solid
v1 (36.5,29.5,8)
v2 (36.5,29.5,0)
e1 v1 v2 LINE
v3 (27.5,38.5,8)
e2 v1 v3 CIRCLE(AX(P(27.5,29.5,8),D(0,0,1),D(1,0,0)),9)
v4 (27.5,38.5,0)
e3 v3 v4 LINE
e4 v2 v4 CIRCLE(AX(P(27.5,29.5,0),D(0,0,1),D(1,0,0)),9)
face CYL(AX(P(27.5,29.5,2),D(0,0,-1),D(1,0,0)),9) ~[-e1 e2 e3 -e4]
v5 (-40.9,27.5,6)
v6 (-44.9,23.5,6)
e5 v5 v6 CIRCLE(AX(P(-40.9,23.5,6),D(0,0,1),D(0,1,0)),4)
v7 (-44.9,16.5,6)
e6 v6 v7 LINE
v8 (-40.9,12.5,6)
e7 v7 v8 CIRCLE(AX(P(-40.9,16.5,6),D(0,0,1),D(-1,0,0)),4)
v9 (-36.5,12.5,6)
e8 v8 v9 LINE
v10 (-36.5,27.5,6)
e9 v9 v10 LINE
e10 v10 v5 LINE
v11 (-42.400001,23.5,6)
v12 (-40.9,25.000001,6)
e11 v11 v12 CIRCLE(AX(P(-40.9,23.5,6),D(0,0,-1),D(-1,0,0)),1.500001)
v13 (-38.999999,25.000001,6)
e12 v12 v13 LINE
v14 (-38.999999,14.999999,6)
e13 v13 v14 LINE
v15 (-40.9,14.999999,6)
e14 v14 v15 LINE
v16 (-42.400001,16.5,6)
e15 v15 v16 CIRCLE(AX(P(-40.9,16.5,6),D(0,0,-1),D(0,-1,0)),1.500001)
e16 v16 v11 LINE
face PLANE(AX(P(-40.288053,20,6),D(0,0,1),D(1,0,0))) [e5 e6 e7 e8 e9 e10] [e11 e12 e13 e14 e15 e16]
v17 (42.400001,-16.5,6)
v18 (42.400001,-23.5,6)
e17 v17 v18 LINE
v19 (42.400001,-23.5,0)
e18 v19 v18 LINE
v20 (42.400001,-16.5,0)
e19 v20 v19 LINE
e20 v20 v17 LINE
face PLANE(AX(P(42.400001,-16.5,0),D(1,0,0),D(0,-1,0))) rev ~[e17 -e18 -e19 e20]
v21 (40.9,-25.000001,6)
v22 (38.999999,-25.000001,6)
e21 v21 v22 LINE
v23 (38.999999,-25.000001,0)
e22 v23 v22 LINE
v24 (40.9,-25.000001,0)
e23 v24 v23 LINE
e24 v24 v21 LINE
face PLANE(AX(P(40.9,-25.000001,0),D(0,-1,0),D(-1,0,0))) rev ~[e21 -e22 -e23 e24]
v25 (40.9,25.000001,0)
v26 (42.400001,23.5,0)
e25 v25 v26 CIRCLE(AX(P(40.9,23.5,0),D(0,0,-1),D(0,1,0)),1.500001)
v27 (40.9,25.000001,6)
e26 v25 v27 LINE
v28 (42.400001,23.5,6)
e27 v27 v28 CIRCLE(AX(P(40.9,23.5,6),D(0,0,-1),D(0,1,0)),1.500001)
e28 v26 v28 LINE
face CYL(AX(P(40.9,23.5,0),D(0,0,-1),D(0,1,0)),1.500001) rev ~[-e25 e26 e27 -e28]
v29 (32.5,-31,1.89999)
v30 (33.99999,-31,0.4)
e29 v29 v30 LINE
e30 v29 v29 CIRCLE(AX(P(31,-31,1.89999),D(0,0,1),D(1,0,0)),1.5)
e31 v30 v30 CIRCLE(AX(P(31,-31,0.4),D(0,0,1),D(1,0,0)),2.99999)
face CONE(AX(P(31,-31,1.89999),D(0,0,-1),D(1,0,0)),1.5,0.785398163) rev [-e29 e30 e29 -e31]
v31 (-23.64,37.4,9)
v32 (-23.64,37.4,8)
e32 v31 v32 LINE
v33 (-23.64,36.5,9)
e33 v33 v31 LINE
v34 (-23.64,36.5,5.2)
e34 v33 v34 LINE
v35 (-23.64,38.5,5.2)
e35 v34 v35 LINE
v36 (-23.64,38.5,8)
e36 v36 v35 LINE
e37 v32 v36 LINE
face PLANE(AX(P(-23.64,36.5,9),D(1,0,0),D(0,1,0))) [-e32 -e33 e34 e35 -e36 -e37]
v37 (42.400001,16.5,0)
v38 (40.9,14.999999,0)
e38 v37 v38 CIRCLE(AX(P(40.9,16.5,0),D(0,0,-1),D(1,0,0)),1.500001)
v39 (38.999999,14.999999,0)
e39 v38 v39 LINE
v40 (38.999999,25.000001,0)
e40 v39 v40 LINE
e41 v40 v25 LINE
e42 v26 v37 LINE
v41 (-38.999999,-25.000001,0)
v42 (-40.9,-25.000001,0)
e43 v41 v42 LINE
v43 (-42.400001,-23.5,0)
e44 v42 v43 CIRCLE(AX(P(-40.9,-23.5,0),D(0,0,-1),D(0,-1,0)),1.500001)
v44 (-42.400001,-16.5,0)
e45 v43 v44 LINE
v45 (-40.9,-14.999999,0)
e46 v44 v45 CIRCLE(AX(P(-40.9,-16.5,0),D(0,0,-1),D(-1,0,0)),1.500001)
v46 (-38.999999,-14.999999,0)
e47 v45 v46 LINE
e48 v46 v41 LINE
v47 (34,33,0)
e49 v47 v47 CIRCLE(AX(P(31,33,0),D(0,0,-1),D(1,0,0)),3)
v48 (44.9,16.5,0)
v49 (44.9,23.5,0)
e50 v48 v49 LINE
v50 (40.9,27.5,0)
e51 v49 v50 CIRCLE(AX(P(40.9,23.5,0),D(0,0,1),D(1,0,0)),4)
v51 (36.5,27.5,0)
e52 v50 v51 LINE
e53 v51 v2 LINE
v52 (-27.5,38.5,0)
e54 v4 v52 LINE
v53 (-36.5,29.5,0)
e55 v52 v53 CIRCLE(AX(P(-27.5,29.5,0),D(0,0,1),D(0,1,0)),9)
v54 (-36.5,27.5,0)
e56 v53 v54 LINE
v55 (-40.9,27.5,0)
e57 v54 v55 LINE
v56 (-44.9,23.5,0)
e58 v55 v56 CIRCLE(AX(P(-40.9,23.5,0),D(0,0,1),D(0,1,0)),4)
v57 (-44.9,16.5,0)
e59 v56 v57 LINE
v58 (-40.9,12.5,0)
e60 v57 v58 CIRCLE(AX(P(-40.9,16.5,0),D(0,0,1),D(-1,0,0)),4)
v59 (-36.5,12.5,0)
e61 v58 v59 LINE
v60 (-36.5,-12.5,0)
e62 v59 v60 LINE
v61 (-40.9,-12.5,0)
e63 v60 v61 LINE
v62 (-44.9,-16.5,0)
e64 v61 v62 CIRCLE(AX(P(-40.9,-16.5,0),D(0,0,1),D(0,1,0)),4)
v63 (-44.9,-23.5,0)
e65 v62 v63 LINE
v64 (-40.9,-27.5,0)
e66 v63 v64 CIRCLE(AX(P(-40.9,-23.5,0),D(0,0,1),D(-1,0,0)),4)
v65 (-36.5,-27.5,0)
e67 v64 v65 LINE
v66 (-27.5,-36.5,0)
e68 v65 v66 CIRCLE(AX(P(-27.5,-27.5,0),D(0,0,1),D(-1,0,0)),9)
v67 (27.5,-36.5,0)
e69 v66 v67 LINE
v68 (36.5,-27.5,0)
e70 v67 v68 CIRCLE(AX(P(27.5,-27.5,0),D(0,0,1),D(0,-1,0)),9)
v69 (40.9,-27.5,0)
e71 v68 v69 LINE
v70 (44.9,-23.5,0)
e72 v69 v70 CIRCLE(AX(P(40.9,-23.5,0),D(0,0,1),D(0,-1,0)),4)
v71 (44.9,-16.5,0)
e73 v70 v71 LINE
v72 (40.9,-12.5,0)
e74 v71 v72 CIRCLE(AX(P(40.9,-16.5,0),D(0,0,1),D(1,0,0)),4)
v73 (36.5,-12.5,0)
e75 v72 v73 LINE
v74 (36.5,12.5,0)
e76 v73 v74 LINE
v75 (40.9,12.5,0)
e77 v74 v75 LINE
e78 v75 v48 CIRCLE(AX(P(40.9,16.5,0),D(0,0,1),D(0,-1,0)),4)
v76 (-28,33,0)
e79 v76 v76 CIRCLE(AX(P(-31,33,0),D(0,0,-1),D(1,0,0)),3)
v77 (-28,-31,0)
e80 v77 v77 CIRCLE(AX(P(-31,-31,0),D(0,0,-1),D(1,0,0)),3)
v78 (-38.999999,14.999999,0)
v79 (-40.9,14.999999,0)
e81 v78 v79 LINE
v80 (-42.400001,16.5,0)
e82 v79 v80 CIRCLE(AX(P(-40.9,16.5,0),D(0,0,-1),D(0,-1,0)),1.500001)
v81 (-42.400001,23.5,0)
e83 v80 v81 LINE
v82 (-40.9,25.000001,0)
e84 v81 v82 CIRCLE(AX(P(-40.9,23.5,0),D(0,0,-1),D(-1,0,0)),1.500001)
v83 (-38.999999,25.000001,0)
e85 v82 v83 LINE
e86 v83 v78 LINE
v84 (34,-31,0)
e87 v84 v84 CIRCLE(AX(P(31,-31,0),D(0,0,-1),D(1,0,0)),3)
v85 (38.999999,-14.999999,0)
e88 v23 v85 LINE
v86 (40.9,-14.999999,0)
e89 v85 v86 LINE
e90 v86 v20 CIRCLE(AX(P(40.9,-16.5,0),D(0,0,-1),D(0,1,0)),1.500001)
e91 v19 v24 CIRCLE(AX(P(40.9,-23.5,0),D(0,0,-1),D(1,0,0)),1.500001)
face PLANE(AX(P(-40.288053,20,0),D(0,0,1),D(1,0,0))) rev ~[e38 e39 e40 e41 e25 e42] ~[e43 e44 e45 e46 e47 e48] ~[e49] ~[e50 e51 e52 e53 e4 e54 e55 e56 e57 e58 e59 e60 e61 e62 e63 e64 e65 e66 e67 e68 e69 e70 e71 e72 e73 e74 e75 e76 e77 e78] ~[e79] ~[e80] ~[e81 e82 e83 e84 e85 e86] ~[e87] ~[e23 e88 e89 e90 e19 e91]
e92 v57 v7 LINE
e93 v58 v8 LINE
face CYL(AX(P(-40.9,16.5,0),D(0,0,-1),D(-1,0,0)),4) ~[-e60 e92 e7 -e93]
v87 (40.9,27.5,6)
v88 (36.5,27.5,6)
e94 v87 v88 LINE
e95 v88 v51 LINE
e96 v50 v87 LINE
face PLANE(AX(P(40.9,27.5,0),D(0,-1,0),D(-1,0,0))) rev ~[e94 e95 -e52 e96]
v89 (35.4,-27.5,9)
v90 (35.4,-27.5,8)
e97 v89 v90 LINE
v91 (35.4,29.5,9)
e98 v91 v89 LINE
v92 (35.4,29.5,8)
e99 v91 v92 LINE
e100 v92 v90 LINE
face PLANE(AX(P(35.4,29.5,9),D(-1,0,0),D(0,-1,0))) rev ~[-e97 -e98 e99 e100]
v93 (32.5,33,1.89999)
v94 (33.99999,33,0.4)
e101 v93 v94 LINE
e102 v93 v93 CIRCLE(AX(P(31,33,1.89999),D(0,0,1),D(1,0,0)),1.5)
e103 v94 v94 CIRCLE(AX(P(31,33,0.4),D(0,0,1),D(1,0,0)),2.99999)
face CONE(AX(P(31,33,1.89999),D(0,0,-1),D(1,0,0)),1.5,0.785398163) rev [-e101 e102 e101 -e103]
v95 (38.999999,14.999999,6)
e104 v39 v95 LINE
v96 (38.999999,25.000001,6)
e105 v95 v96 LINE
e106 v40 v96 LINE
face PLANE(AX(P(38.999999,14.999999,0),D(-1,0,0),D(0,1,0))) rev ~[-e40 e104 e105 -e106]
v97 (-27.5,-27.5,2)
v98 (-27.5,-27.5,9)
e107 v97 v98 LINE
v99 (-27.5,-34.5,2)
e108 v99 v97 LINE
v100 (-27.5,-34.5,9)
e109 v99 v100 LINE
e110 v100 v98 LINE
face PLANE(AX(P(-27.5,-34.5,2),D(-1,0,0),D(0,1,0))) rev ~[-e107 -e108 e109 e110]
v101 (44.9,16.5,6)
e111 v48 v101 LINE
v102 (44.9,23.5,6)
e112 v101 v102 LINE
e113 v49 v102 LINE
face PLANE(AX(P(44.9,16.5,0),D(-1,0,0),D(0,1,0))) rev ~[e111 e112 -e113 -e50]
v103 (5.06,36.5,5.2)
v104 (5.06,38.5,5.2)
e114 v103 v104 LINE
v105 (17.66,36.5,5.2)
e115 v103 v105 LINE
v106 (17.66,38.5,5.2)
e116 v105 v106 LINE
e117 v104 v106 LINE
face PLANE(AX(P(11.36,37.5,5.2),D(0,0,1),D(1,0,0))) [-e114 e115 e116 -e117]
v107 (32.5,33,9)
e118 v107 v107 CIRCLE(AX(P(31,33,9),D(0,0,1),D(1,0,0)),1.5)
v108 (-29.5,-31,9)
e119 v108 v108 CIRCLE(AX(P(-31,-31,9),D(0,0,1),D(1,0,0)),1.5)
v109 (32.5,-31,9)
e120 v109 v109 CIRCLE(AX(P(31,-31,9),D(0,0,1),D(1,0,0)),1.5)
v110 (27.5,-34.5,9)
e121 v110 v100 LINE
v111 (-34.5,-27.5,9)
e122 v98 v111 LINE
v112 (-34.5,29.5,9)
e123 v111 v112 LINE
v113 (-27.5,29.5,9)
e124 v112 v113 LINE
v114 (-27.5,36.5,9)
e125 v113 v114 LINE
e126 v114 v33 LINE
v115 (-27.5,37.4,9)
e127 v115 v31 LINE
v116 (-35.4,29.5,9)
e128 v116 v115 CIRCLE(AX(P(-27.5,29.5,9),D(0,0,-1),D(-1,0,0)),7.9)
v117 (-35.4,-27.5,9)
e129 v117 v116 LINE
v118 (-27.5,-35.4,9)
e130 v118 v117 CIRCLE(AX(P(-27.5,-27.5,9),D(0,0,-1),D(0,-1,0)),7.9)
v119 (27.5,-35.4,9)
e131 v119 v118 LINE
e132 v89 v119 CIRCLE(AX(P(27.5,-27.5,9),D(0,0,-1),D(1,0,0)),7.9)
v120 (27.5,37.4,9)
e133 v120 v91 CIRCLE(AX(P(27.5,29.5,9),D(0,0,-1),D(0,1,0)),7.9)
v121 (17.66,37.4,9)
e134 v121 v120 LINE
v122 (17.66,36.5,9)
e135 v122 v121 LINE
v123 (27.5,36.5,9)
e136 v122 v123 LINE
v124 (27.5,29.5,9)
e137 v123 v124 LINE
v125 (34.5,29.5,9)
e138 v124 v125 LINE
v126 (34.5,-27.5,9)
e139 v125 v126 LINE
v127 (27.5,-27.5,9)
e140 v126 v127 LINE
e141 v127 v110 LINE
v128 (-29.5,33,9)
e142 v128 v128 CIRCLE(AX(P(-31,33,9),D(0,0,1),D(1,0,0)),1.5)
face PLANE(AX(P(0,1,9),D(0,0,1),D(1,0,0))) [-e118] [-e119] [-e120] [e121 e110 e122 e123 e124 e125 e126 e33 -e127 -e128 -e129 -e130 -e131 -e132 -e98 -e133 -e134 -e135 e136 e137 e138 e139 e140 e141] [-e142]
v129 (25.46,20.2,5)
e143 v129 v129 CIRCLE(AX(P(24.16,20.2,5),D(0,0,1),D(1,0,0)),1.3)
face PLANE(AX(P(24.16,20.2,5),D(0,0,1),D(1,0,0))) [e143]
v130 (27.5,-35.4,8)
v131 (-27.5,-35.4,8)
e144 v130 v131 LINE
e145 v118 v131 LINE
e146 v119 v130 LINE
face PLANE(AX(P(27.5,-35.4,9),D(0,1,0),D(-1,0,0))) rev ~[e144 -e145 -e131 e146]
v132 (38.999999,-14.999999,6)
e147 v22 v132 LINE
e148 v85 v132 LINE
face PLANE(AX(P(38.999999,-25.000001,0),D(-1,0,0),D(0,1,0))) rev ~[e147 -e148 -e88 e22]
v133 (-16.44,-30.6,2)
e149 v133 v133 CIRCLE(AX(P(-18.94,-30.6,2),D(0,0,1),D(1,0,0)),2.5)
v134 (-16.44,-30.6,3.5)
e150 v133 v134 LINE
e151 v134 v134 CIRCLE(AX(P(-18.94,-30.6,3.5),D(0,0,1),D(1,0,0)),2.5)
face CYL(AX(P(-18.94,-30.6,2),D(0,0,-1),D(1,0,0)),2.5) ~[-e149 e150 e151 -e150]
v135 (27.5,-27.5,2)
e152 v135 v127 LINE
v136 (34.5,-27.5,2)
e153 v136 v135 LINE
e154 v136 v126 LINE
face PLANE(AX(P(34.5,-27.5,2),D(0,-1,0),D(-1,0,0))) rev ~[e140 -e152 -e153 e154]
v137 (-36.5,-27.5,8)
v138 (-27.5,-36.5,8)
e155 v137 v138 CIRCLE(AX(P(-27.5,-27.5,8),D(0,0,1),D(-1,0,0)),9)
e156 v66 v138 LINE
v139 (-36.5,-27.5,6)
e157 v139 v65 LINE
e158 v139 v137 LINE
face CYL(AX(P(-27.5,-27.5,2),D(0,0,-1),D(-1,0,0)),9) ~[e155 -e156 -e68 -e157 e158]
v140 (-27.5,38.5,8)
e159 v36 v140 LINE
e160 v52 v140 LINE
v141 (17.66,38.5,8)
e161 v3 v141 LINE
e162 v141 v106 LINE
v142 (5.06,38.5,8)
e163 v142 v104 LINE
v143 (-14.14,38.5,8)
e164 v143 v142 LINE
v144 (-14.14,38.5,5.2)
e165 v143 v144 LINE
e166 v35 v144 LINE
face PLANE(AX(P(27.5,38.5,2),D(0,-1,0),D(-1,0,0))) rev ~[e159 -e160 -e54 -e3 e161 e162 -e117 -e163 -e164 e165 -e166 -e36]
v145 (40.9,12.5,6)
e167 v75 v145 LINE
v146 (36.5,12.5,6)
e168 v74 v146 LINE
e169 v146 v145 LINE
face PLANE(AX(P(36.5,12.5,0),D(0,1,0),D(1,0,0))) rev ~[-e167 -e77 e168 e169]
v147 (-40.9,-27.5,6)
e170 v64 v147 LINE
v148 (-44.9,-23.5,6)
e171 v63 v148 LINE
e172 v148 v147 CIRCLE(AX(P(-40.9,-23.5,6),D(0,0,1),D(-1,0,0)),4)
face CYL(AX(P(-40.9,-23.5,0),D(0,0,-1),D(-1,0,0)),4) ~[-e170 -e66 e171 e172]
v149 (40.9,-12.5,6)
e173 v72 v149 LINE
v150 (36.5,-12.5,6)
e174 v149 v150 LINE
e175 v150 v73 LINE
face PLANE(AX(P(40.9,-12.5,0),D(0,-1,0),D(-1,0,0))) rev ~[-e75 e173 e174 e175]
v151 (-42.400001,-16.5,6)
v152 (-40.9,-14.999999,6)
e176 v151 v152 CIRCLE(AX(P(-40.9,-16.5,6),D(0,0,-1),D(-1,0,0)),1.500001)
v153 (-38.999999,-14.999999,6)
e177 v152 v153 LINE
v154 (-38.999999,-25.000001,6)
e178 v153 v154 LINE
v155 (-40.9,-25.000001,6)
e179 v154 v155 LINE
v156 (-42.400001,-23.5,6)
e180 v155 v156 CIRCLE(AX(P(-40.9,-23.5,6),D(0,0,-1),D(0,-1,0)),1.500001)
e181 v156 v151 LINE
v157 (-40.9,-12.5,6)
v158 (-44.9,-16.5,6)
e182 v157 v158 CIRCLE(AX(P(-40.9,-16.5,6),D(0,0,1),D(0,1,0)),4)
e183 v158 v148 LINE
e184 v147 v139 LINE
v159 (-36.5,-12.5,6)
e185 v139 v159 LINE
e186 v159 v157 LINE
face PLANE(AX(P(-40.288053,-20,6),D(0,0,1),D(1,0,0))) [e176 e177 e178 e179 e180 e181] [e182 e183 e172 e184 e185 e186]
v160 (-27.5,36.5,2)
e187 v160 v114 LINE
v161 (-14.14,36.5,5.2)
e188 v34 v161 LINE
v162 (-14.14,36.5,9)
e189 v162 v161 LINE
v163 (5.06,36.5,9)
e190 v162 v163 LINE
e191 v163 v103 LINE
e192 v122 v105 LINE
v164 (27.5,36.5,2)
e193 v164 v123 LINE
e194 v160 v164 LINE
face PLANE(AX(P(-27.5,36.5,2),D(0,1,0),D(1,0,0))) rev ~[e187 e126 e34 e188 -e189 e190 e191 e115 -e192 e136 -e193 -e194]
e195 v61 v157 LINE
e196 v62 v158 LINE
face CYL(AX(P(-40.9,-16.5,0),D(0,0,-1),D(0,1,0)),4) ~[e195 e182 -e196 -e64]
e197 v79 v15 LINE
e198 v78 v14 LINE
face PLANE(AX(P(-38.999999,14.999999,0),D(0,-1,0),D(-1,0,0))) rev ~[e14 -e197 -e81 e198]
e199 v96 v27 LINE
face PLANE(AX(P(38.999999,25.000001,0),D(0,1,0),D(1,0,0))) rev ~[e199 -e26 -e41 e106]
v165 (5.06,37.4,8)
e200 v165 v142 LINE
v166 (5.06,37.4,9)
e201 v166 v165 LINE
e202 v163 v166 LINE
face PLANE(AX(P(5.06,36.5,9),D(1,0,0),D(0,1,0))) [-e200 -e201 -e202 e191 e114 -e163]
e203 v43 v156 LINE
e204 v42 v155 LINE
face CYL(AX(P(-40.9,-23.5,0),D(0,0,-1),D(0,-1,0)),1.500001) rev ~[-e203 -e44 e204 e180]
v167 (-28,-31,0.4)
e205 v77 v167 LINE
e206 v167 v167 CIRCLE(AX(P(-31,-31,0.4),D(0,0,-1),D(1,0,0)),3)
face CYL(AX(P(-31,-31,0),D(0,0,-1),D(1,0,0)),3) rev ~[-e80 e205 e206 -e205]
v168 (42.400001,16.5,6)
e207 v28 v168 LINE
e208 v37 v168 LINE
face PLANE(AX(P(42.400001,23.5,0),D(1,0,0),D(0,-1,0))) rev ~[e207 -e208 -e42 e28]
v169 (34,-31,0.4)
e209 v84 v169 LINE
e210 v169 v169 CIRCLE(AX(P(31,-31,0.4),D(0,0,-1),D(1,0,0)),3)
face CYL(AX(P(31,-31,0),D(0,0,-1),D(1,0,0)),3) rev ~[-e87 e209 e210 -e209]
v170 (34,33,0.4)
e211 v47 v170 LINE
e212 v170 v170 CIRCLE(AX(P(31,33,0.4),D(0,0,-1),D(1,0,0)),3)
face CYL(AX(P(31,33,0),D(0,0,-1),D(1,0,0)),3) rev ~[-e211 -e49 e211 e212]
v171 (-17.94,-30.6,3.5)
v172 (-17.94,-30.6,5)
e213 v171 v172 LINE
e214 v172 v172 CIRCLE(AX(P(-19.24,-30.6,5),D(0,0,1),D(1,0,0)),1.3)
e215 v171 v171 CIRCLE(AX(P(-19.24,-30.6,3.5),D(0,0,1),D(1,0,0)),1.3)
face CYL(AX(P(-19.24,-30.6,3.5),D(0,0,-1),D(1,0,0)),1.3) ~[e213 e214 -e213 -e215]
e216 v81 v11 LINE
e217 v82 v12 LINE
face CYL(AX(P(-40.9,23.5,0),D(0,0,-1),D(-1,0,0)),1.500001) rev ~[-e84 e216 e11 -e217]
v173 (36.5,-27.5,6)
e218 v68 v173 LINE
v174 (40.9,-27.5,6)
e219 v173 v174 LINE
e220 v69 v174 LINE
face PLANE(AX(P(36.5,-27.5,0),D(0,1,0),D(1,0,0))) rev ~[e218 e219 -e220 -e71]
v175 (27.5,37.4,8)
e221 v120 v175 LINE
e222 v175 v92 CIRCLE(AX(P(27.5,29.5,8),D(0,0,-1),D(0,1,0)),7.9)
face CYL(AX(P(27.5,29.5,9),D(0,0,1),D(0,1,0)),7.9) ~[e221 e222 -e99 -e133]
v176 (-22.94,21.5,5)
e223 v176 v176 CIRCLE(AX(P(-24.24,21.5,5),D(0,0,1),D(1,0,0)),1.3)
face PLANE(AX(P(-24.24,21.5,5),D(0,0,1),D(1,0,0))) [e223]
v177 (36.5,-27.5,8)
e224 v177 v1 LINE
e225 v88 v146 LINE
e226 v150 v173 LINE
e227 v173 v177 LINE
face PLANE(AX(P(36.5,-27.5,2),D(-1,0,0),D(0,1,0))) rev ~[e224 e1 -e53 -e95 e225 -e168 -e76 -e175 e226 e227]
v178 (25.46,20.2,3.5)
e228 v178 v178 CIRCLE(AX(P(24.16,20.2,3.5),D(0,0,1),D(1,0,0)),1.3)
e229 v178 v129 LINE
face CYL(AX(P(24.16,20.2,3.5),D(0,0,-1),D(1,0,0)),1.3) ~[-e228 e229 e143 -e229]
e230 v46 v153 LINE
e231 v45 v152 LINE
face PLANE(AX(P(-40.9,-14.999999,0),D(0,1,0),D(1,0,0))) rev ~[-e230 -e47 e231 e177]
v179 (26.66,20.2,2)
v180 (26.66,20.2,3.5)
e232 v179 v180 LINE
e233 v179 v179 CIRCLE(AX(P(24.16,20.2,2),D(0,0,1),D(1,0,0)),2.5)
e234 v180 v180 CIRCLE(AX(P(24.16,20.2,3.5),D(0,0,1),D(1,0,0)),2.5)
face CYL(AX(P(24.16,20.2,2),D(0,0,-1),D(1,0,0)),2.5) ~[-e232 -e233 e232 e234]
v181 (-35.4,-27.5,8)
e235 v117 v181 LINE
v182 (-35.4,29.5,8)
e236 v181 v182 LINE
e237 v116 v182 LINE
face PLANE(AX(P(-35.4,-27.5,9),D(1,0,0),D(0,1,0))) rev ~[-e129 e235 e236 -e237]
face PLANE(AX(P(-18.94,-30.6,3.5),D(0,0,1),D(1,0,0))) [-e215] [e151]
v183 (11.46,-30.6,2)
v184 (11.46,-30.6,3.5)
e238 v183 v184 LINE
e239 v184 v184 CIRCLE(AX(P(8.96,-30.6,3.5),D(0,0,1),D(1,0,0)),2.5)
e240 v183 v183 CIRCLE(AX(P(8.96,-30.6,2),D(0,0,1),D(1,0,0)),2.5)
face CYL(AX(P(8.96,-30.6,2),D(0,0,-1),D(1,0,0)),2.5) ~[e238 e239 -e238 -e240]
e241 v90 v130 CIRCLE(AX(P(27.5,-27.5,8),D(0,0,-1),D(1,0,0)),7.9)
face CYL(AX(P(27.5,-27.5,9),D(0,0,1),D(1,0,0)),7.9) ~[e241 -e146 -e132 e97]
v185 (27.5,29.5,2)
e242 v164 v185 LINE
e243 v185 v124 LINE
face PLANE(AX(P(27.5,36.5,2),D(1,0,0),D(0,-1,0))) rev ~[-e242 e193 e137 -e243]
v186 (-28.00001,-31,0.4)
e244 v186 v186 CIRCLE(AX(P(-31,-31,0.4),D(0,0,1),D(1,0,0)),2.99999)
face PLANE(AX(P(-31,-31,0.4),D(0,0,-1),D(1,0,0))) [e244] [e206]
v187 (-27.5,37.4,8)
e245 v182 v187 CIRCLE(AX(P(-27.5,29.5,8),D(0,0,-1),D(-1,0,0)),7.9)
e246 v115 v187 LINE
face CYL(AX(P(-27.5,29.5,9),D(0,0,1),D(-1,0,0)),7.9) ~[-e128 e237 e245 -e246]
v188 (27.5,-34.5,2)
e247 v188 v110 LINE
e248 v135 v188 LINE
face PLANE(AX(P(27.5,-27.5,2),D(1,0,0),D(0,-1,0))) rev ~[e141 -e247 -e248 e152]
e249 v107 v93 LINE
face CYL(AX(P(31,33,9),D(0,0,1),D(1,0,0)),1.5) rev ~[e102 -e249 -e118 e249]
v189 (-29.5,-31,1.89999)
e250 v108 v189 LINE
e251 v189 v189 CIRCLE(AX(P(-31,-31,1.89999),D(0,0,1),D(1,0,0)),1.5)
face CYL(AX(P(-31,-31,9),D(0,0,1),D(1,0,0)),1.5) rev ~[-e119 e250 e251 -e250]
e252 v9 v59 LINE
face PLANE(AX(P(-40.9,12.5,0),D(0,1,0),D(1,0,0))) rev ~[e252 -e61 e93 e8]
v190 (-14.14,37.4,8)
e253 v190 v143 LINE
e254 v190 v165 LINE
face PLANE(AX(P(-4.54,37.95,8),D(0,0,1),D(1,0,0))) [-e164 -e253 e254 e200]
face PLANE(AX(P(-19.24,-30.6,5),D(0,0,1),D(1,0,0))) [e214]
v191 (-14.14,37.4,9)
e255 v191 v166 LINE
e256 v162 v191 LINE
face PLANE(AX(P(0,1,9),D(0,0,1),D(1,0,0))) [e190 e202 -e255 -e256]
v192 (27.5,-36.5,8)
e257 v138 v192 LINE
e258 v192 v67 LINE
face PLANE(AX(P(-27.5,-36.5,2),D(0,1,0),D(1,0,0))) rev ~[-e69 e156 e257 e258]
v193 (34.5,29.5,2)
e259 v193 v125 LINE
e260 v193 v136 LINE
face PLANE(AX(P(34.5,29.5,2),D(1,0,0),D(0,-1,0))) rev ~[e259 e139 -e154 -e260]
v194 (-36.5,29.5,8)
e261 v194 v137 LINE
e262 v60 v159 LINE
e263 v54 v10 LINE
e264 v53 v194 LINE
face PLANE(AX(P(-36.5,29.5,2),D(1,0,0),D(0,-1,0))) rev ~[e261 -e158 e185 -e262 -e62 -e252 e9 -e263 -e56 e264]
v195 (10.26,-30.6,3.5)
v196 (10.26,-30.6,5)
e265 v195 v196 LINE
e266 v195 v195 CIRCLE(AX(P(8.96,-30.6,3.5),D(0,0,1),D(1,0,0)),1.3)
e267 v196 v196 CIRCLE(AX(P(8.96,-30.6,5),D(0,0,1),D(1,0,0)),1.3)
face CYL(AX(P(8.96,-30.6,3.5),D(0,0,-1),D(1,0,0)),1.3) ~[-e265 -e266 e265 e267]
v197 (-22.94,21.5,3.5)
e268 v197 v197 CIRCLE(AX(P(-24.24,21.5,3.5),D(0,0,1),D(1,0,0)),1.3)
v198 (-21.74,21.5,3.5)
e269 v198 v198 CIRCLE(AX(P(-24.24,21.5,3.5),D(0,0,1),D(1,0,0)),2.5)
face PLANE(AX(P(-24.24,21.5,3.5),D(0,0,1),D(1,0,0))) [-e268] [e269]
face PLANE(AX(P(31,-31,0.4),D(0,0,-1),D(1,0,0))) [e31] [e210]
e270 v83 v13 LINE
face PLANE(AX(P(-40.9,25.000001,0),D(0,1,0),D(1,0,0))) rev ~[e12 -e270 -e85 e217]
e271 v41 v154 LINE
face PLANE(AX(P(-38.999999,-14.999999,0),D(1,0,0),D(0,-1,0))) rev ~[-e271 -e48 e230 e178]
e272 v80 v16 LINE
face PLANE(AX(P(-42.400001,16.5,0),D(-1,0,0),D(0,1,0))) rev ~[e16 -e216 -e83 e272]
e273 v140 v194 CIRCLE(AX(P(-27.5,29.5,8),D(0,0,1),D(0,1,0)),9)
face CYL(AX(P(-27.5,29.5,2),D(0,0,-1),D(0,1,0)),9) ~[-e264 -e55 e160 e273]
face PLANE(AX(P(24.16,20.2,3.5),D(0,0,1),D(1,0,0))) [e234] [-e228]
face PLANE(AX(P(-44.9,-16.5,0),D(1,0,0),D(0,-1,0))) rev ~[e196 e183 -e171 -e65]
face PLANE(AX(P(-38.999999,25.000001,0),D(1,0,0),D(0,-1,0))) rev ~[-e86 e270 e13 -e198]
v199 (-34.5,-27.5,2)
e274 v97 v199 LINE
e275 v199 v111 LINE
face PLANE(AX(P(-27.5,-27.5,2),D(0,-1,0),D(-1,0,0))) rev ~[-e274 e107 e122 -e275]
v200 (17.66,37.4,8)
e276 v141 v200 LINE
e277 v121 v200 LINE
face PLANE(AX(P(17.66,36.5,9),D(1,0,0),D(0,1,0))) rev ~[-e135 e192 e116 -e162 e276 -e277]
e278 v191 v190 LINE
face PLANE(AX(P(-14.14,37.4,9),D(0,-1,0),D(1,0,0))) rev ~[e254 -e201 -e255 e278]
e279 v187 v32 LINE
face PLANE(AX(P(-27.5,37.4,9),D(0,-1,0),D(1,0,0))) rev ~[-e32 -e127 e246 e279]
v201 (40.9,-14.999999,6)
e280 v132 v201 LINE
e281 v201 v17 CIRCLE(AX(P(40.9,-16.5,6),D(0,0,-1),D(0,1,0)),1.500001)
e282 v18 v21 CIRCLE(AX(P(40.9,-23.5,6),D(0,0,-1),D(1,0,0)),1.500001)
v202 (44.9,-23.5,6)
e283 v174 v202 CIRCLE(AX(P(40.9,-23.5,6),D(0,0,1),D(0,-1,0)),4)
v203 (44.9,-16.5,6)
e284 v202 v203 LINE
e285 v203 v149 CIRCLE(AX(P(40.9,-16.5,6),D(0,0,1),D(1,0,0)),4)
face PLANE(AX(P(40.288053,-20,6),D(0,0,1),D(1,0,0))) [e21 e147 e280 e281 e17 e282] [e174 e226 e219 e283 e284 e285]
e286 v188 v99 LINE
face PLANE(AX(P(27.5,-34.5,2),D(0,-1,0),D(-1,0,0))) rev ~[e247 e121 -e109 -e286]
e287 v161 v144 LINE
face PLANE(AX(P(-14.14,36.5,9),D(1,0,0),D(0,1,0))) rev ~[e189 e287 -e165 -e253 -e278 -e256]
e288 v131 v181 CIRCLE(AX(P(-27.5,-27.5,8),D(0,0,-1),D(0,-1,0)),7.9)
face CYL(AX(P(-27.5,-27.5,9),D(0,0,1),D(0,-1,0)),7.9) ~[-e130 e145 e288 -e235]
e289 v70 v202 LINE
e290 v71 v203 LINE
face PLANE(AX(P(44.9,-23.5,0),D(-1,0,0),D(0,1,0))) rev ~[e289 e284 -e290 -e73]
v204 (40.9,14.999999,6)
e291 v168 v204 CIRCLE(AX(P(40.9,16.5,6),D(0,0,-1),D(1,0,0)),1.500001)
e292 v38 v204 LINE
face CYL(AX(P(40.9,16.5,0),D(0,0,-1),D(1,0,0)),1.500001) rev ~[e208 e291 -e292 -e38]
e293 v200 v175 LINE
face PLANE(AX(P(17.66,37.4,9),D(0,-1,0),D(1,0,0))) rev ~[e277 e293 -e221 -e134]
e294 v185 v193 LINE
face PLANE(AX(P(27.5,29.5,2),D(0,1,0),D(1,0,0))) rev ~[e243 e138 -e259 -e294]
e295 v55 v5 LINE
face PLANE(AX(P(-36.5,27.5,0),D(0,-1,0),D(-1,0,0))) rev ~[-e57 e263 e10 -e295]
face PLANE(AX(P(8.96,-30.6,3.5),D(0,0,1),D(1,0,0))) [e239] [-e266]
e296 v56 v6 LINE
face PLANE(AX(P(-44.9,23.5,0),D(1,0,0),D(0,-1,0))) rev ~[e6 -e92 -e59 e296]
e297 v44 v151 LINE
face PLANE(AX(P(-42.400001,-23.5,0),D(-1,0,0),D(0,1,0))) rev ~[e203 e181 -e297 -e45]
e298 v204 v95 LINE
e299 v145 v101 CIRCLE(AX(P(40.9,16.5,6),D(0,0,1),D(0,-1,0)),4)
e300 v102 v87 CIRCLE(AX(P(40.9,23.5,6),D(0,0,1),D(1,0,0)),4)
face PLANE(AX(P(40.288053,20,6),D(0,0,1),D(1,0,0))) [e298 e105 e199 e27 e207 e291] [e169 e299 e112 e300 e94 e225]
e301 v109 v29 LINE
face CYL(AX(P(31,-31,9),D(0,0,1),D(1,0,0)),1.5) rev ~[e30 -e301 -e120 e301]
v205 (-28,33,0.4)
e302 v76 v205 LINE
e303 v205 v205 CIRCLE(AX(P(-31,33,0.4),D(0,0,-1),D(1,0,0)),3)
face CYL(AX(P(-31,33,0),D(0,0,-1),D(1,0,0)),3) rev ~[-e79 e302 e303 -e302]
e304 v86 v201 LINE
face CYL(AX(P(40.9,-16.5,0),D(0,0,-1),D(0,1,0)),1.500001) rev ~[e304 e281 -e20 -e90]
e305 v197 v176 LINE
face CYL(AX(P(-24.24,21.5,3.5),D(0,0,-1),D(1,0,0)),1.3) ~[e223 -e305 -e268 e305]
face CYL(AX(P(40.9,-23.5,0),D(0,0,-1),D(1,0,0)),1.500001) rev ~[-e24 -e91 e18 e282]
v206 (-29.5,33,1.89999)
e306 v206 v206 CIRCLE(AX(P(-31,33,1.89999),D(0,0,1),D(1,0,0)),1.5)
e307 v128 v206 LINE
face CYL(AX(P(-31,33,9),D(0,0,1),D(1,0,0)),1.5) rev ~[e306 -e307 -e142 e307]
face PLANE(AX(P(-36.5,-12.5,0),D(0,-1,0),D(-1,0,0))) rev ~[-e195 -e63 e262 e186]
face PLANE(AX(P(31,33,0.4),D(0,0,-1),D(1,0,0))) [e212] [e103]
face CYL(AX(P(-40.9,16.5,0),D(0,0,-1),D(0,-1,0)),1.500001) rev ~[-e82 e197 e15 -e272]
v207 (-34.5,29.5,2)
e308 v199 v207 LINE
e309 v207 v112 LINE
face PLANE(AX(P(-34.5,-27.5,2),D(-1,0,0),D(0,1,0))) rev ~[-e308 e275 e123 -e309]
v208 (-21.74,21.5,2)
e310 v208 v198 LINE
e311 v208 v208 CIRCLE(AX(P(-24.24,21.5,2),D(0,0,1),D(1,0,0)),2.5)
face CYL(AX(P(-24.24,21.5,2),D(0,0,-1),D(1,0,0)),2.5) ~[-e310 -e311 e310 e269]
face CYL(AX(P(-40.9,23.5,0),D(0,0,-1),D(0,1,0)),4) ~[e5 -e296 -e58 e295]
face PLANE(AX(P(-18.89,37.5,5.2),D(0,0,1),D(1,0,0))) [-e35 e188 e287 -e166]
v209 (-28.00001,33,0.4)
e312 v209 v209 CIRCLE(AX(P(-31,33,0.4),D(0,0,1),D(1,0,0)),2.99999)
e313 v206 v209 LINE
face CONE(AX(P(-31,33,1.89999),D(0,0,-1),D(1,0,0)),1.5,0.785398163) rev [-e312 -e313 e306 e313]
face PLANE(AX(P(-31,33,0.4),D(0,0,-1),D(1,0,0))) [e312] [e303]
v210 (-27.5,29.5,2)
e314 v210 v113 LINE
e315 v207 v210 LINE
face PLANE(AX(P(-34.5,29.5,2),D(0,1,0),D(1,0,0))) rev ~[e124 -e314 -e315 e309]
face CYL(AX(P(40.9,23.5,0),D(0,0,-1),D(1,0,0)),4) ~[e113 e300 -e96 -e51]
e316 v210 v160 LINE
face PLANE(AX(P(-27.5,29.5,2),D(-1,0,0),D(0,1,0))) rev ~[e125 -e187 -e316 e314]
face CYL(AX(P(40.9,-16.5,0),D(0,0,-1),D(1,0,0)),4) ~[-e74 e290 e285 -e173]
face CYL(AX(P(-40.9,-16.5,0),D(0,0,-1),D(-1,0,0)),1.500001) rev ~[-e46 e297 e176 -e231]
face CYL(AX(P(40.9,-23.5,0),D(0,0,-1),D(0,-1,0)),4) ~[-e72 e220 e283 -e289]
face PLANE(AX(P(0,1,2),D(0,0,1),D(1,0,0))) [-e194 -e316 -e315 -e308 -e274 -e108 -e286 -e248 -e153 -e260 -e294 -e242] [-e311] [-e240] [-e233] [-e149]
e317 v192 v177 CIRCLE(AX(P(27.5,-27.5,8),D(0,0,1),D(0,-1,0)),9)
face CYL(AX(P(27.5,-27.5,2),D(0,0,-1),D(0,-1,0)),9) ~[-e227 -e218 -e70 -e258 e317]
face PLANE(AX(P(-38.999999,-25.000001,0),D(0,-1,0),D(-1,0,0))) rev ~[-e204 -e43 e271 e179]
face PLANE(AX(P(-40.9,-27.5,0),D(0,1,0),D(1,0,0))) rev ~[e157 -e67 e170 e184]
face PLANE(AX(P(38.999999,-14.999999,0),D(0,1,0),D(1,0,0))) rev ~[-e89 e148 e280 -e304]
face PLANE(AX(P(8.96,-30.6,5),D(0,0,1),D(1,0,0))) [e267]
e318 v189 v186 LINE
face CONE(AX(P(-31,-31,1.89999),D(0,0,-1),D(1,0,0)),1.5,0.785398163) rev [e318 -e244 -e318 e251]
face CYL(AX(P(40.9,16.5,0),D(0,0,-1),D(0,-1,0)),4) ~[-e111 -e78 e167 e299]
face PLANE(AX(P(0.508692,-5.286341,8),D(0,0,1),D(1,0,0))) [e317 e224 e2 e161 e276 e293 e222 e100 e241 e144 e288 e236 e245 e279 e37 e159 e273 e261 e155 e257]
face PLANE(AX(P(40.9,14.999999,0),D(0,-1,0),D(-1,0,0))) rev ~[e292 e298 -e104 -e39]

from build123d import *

# Parameters (mm, degrees)
F1_DEPTH  = 2
F2_DEPTH  = 6
F3_R      = 2.5
F4_DEPTH  = 1.5
F5_R      = 1.3
F6_DEPTH  = 1.5
F8_DEPTH  = 7
F9_R      = 1.5
F10_DEPTH = 10
F11_W     = 12.6
F11_H     = 2
F11_W_2   = 9.5
F12_DEPTH = 3.8
F13_R     = 3
F14_DEPTH = 0.4
F15_SIZE  = 1.49999
F16_W     = 19.2
F16_H     = 1.1
F17_DEPTH = 1


# Not quite as in the source:
# - a fillet or chamfer is up to 0.001 mm smaller than in the source, because OpenCascade refuses the exact size


with BuildPart() as f1:
    # F0 (on Top) → F1 (new body)
    with BuildSketch(Plane.XY):
        with BuildLine():
            Line((27.5, 38.5), (-27.5, 38.5))
            ThreePointArc((-27.5, 38.5), (-33.8639610307, 35.8639610307), (-36.5, 29.5))
            Line((-36.5, 29.5), (-36.5, 27.5))
            Line((-36.5, 27.5), (-36.5, 12.5))
            Line((-36.5, 12.5), (-36.5, -12.5))
            Line((-36.5, -12.5), (-36.5, -27.5))
            ThreePointArc((-36.5, -27.5), (-33.8639610307, -33.8639610307), (-27.5, -36.5))
            Line((-27.5, -36.5), (27.5, -36.5))
            ThreePointArc((27.5, -36.5), (33.8639610307, -33.8639610307), (36.5, -27.5))
            Line((36.5, -27.5), (36.5, -12.5))
            Line((36.5, -12.5), (36.5, 12.5))
            Line((36.5, 12.5), (36.5, 27.5))
            Line((36.5, 27.5), (36.5, 29.5))
            ThreePointArc((36.5, 29.5), (33.8639610307, 35.8639610307), (27.5, 38.5))
        make_face()
    extrude(amount=F1_DEPTH)

    # F0 (on Top) → F2 (join)
    with BuildSketch(Plane.XY):
        with BuildLine():
            Line((-36.5, 12.5), (-36.5, 27.5))
            Line((-36.5, 27.5), (-40.9, 27.5))
            ThreePointArc((-40.9, 27.5), (-43.7284271247, 26.3284271247), (-44.9, 23.5))
            Line((-44.9, 23.5), (-44.9, 16.5))
            ThreePointArc((-44.9, 16.5), (-43.7284271247, 13.6715728753), (-40.9, 12.5))
            Line((-40.9, 12.5), (-36.5, 12.5))
        make_face()
        with BuildLine():
            Line((-40.9, 25.0000007004), (-38.9999992996, 25.0000007004))
            Line((-38.9999992996, 25.0000007004), (-38.9999992996, 14.9999992996))
            Line((-38.9999992996, 14.9999992996), (-40.9, 14.9999992996))
            ThreePointArc((-40.9, 14.9999992996), (-41.960660667, 15.439339333), (-42.4000007004, 16.5))
            Line((-42.4000007004, 16.5), (-42.4000007004, 23.5))
            ThreePointArc((-42.4000007004, 23.5), (-41.960660667, 24.560660667), (-40.9, 25.0000007004))
        make_face(mode=Mode.SUBTRACT)
        with BuildLine():
            Line((-36.5, -27.5), (-36.5, -12.5))
            Line((-36.5, -12.5), (-40.9, -12.5))
            ThreePointArc((-40.9, -12.5), (-43.7284271247, -13.6715728753), (-44.9, -16.5))
            Line((-44.9, -16.5), (-44.9, -23.5))
            ThreePointArc((-44.9, -23.5), (-43.7284271247, -26.3284271247), (-40.9, -27.5))
            Line((-40.9, -27.5), (-36.5, -27.5))
        make_face()
        with BuildLine():
            Line((-38.9999992996, -14.9999992996), (-38.9999992996, -25.0000007004))
            Line((-38.9999992996, -25.0000007004), (-40.9, -25.0000007004))
            ThreePointArc((-40.9, -25.0000007004), (-41.960660667, -24.560660667), (-42.4000007004, -23.5))
            Line((-42.4000007004, -23.5), (-42.4000007004, -16.5))
            ThreePointArc((-42.4000007004, -16.5), (-41.960660667, -15.439339333), (-40.9, -14.9999992996))
            Line((-40.9, -14.9999992996), (-38.9999992996, -14.9999992996))
        make_face(mode=Mode.SUBTRACT)
        with BuildLine():
            Line((40.9, 27.5), (36.5, 27.5))
            Line((36.5, 27.5), (36.5, 12.5))
            Line((36.5, 12.5), (40.9, 12.5))
            ThreePointArc((40.9, 12.5), (43.7284271247, 13.6715728753), (44.9, 16.5))
            Line((44.9, 16.5), (44.9, 23.5))
            ThreePointArc((44.9, 23.5), (43.7284271247, 26.3284271247), (40.9, 27.5))
        make_face()
        with BuildLine():
            Line((40.9, 14.9999992996), (38.9999992996, 14.9999992996))
            Line((38.9999992996, 14.9999992996), (38.9999992996, 25.0000007004))
            Line((38.9999992996, 25.0000007004), (40.9, 25.0000007004))
            ThreePointArc((40.9, 25.0000007004), (41.960660667, 24.560660667), (42.4000007004, 23.5))
            Line((42.4000007004, 23.5), (42.4000007004, 16.5))
            ThreePointArc((42.4000007004, 16.5), (41.960660667, 15.439339333), (40.9, 14.9999992996))
        make_face(mode=Mode.SUBTRACT)
        with BuildLine():
            Line((40.9, -12.5), (36.5, -12.5))
            Line((36.5, -12.5), (36.5, -27.5))
            Line((36.5, -27.5), (40.9, -27.5))
            ThreePointArc((40.9, -27.5), (43.7284271247, -26.3284271247), (44.9, -23.5))
            Line((44.9, -23.5), (44.9, -16.5))
            ThreePointArc((44.9, -16.5), (43.7284271247, -13.6715728753), (40.9, -12.5))
        make_face()
        with BuildLine():
            Line((38.9999992996, -14.9999992996), (40.9, -14.9999992996))
            ThreePointArc((40.9, -14.9999992996), (41.960660667, -15.439339333), (42.4000007004, -16.5))
            Line((42.4000007004, -16.5), (42.4000007004, -23.5))
            ThreePointArc((42.4000007004, -23.5), (41.960660667, -24.560660667), (40.9, -25.0000007004))
            Line((40.9, -25.0000007004), (38.9999992996, -25.0000007004))
            Line((38.9999992996, -25.0000007004), (38.9999992996, -14.9999992996))
        make_face(mode=Mode.SUBTRACT)
    extrude(amount=F2_DEPTH)

    # F3 (on face) → F4 (join)
    with BuildSketch(Plane.XY.offset(2)):
        with Locations((-18.94, -30.6)):
            Circle(F3_R)
        with Locations((8.96, -30.6)):
            Circle(F3_R)
        with Locations((24.16, 20.2)):
            Circle(F3_R)
        with Locations((-24.24, 21.5)):
            Circle(F3_R)
    extrude(amount=F4_DEPTH)

    # F5 (on face) → F6 (join)
    with BuildSketch(Plane.XY.offset(3.5)):
        with Locations((-19.24, -30.6)):
            Circle(F5_R)
        with Locations((8.96, -30.6)):
            Circle(F5_R)
        with Locations((24.16, 20.2)):
            Circle(F5_R)
        with Locations((-24.24, 21.5)):
            Circle(F5_R)
    extrude(amount=F6_DEPTH)

    # F7 (on face) → F8 (join)
    with BuildSketch(Plane.XY.offset(2)):
        with BuildLine():
            Line((27.5, 38.5), (-27.5, 38.5))
            ThreePointArc((-27.5, 38.5), (-33.8639610307, 35.8639610307), (-36.5, 29.5))
            Line((-36.5, 29.5), (-36.5, -27.5))
            ThreePointArc((-36.5, -27.5), (-33.8639610307, -33.8639610307), (-27.5, -36.5))
            Line((-27.5, -36.5), (27.5, -36.5))
            ThreePointArc((27.5, -36.5), (33.8639610307, -33.8639610307), (36.5, -27.5))
            Line((36.5, -27.5), (36.5, 29.5))
            ThreePointArc((36.5, 29.5), (33.8639610307, 35.8639610307), (27.5, 38.5))
        make_face()
        Polygon((-27.5, 29.5), (-27.5, 36.5), (27.5, 36.5), (27.5, 29.5), (34.5, 29.5), (34.5, -27.5), (27.5, -27.5), (27.5, -34.5), (-27.5, -34.5), (-27.5, -27.5), (-34.5, -27.5), (-34.5, 29.5), align=None, mode=Mode.SUBTRACT)
    extrude(amount=F8_DEPTH)

    # F9 (on face) → F10 (cut)
    with BuildSketch(Plane.XY.offset(9)):
        with Locations((-31, 33)):
            Circle(F9_R)
        with Locations((31, 33)):
            Circle(F9_R)
        with Locations((-31, -31)):
            Circle(F9_R)
        with Locations((31, -31)):
            Circle(F9_R)
    extrude(amount=-F10_DEPTH, mode=Mode.SUBTRACT)

    # F11 (on face) → F12 (cut)
    with BuildSketch(Plane.XY.offset(9)):
        with Locations((11.36, 37.5)):
            Rectangle(F11_W, F11_H)
        with Locations((-18.89, 37.5)):
            Rectangle(F11_W_2, F11_H)
    extrude(amount=-F12_DEPTH, mode=Mode.SUBTRACT)

    # F13 (on face) → F14 (cut)
    with BuildSketch(Plane(origin=(0, 0, 0), x_dir=(1, 0, 0), z_dir=(0, 0, -1))):
        with Locations((31, -33)):
            Circle(F13_R)
        with Locations((-31, -33)):
            Circle(F13_R)
        with Locations((-31, 31)):
            Circle(F13_R)
        with Locations((31, 31)):
            Circle(F13_R)
    extrude(amount=-F14_DEPTH, mode=Mode.SUBTRACT)

    # F15 (size 1.5 in the source; OpenCascade refuses exactly that, so slightly less here)
    f15_edges = [f1.edges().sort_by_distance(p)[0] for p in [
        (29.5, 33, 0.4),
        (-32.5, 33, 0.4),
        (29.5, -31, 0.4),
        (-32.5, -31, 0.4),
    ]]
    chamfer(f15_edges, length=F15_SIZE)

    # F16 (on face) → F17 (cut)
    with BuildSketch(Plane.XY.offset(9)):
        with BuildLine():
            Line((-23.64, 38.5), (-27.5, 38.5))
            ThreePointArc((-27.5, 38.5), (-33.8639610307, 35.8639610307), (-36.5, 29.5))
            Line((-36.5, 29.5), (-36.5, -27.5))
            ThreePointArc((-36.5, -27.5), (-33.8639610307, -33.8639610307), (-27.5, -36.5))
            Line((-27.5, -36.5), (27.5, -36.5))
            ThreePointArc((27.5, -36.5), (33.8639610307, -33.8639610307), (36.5, -27.5))
            Line((36.5, -27.5), (36.5, 29.5))
            ThreePointArc((36.5, 29.5), (33.8639610307, 35.8639610307), (27.5, 38.5))
            Line((27.5, 38.5), (17.66, 38.5))
            Line((17.66, 38.5), (17.66, 37.4))
            Line((17.66, 37.4), (27.5, 37.4))
            ThreePointArc((27.5, 37.4), (33.0861435714, 35.0861435714), (35.4, 29.5))
            Line((35.4, 29.5), (35.4, -27.5))
            ThreePointArc((35.4, -27.5), (33.0861435714, -33.0861435714), (27.5, -35.4))
            Line((27.5, -35.4), (-27.5, -35.4))
            ThreePointArc((-27.5, -35.4), (-33.0861435714, -33.0861435714), (-35.4, -27.5))
            Line((-35.4, -27.5), (-35.4, 29.5))
            ThreePointArc((-35.4, 29.5), (-33.0861435714, 35.0861435714), (-27.5, 37.4))
            Line((-27.5, 37.4), (-23.64, 37.4))
            Line((-23.64, 37.4), (-23.64, 38.5))
        make_face()
        with Locations((-4.54, 37.95)):
            Rectangle(F16_W, F16_H)
    extrude(amount=-F17_DEPTH, mode=Mode.SUBTRACT)


solid = f1.part
